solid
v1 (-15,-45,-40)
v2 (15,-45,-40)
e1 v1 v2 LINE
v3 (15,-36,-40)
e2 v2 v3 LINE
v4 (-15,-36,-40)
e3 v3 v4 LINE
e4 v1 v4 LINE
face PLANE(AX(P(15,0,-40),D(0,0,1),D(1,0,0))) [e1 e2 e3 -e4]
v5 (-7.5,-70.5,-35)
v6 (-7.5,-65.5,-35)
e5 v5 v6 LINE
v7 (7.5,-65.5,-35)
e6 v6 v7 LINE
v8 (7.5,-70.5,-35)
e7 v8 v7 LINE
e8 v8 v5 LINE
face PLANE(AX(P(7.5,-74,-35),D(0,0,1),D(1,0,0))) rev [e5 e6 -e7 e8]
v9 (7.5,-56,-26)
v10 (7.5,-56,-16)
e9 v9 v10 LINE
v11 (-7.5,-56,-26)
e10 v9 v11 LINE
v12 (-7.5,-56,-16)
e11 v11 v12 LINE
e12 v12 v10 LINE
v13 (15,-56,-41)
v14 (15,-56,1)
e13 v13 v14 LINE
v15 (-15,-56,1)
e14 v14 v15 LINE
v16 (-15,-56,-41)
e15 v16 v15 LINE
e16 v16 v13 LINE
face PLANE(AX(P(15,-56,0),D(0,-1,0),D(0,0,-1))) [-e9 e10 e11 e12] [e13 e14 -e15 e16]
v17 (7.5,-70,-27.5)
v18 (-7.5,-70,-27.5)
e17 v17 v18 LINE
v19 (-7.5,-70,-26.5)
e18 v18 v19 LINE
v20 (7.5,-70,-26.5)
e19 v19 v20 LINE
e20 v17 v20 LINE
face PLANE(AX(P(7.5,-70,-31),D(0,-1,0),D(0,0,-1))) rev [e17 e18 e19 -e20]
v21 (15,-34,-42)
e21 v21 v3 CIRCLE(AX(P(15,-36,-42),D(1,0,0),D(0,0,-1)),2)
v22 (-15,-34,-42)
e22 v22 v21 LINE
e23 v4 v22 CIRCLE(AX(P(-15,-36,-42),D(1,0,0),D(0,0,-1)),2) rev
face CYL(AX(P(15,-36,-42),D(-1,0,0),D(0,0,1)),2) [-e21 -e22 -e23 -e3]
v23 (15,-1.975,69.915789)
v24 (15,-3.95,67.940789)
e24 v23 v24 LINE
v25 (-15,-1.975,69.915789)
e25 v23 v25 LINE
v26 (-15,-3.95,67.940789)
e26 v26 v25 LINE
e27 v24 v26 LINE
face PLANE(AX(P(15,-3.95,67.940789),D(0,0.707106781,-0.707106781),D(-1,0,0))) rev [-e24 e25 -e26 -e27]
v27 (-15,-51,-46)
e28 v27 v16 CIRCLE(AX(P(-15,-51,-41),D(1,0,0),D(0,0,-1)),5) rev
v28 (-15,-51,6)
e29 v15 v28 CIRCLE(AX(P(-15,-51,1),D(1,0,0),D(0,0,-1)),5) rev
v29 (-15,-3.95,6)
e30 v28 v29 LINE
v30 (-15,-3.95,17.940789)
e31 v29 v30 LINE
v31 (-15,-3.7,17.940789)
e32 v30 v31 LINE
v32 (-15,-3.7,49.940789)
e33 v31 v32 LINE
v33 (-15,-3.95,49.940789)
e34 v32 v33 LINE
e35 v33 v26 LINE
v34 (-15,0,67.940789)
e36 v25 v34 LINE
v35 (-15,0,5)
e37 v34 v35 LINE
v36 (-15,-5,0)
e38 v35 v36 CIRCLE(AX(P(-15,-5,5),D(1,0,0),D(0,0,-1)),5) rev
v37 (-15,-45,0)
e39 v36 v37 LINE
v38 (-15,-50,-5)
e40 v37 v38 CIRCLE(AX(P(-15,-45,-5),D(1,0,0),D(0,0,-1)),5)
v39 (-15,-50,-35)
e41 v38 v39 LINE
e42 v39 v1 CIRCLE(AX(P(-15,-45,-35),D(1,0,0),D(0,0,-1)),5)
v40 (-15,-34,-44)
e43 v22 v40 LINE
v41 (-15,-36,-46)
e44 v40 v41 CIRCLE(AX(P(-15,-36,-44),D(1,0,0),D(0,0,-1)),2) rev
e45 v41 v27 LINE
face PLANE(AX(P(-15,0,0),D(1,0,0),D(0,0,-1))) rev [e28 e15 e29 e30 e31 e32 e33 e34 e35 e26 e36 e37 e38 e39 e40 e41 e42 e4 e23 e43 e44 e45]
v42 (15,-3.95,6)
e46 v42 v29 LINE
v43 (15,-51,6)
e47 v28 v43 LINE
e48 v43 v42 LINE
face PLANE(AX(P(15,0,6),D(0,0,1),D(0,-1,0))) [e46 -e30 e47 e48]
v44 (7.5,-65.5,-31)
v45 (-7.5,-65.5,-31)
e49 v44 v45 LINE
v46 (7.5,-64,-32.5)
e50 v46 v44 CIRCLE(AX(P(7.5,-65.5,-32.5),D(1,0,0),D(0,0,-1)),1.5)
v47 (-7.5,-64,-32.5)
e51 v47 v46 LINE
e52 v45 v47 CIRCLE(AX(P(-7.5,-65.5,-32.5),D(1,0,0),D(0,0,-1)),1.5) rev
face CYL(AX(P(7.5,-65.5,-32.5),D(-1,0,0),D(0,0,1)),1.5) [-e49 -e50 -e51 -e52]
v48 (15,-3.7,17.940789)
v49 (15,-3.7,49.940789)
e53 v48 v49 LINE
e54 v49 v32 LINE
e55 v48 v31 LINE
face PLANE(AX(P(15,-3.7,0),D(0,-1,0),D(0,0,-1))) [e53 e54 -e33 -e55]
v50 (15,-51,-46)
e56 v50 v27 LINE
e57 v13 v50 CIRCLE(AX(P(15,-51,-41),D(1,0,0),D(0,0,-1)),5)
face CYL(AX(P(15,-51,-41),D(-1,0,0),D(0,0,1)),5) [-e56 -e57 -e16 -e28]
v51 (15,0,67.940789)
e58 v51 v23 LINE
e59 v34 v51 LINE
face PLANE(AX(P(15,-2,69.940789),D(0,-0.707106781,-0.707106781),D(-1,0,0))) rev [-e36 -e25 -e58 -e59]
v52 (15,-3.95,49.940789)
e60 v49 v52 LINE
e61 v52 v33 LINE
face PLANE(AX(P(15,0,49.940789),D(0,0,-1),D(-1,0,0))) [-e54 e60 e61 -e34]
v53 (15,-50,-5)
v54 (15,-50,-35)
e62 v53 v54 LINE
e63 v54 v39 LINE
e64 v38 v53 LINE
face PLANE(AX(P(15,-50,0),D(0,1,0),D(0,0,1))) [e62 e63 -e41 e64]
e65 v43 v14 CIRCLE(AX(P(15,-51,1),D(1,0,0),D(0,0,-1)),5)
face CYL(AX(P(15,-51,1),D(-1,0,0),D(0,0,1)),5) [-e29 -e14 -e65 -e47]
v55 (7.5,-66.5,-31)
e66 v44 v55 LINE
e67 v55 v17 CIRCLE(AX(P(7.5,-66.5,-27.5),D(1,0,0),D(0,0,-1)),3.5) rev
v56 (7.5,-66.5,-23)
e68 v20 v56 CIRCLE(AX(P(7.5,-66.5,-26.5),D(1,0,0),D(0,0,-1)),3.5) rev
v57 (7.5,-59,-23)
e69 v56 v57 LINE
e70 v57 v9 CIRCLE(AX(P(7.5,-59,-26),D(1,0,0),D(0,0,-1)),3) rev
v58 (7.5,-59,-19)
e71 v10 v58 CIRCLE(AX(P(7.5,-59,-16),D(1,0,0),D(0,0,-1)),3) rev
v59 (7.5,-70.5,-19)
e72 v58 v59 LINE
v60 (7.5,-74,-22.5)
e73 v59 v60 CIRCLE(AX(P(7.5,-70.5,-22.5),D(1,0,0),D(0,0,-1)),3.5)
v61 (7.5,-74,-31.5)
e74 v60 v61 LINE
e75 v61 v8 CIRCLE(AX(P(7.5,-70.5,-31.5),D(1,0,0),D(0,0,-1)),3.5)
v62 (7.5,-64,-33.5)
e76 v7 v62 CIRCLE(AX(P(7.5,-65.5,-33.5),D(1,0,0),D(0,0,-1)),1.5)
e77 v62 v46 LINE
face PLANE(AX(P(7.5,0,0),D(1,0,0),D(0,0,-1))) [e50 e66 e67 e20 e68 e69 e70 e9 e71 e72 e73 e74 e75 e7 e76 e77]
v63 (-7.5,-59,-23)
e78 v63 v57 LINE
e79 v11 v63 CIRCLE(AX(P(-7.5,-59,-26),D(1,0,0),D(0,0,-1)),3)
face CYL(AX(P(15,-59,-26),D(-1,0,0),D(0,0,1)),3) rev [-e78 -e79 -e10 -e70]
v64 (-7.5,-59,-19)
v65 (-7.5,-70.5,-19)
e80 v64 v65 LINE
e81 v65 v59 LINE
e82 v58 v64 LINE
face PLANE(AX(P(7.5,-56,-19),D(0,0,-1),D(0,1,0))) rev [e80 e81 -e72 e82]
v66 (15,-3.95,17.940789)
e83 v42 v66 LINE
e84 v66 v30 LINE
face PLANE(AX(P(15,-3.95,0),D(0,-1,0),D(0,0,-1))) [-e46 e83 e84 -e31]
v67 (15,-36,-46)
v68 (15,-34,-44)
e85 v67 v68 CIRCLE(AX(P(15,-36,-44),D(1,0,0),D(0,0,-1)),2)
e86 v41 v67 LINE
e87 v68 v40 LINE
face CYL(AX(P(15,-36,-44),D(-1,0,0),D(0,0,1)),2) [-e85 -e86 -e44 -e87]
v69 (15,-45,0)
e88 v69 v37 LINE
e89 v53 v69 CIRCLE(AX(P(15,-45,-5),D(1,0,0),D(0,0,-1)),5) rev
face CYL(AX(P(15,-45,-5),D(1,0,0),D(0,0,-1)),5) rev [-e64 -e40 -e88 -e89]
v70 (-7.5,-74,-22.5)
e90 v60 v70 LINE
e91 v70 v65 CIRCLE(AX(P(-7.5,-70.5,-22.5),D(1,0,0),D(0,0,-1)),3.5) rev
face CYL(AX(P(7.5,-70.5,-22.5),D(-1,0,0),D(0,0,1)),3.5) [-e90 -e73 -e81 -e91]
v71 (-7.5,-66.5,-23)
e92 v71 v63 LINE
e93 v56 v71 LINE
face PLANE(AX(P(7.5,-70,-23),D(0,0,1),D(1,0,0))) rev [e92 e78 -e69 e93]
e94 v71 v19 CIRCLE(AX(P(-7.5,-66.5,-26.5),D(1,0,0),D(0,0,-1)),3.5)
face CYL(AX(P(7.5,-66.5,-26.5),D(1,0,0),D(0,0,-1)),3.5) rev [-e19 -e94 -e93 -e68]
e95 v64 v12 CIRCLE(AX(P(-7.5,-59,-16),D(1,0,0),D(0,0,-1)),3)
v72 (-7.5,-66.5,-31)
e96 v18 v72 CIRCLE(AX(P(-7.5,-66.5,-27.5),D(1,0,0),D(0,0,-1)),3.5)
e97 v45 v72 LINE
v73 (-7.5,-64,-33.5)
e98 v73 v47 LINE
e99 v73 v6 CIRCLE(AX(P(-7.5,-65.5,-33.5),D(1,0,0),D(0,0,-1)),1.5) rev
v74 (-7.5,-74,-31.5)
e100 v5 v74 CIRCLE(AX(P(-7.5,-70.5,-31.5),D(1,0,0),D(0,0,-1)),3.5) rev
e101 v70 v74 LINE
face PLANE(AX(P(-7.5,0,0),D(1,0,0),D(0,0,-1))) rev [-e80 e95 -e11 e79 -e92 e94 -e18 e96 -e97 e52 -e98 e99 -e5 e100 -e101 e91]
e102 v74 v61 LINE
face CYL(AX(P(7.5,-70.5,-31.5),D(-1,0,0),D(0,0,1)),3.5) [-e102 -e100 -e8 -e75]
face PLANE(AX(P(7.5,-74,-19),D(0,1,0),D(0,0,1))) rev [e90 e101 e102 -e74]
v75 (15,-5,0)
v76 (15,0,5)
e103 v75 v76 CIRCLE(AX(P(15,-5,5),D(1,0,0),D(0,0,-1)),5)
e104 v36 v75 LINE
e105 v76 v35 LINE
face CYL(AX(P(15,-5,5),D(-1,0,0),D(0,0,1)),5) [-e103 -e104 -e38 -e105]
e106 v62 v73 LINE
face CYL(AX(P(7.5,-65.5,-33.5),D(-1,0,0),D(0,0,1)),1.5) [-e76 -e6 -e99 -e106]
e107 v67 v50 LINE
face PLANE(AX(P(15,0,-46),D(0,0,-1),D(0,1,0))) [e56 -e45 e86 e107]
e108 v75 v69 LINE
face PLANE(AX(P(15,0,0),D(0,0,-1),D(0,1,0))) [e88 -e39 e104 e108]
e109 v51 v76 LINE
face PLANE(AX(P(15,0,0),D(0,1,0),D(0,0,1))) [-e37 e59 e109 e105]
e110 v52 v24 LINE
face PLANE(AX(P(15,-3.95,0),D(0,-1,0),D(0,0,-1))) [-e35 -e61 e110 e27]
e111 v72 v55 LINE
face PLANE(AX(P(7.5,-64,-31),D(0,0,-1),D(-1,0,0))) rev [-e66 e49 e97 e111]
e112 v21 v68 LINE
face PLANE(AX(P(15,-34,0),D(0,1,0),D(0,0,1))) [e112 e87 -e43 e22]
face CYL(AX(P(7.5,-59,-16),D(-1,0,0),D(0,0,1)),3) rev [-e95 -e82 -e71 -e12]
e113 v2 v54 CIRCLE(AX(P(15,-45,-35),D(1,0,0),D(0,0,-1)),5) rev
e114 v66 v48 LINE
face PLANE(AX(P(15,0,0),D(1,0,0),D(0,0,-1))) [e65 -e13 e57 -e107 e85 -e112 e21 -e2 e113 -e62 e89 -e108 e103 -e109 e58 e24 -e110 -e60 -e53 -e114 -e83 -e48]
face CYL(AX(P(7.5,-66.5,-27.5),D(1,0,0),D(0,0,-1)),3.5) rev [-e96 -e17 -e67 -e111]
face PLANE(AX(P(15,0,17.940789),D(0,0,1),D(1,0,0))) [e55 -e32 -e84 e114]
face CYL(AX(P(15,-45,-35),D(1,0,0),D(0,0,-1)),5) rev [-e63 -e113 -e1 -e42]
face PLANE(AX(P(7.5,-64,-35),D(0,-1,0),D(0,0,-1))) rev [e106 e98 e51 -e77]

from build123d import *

# Parameters (mm, degrees)
BOSS_EXTRUDE1_DEPTH = 15
FILLET2_R           = 5
FILLET3_R           = 5
FILLET4_R           = 5
CHAMFER1_SIZE       = 2
BOSS_EXTRUDE2_DEPTH = 7.5
FILLET5_R           = 3
FILLET6_R           = 3.5
FILLET7_R           = 3.5
FILLET8_R           = 1.5
FILLET9_R           = 2


with BuildPart() as part:
    # Sketch1 → Boss-Extrude1 (new, symmetric)
    with BuildSketch(Plane(origin=(0, 0, 0), x_dir=(0, 0, -1), z_dir=(1, 0, 0))):
        Polygon((0, 0), (-15, 0), (-69.940788655, 0), (-69.940788655, -3.95), (-49.940788655, -3.95), (-49.940788655, -3.7), (-17.940788655, -3.7), (-17.940788655, -3.95), (-13.226857143, -3.95), (-6, -3.95), (-6, -56), (46, -56), (46, -34), (40, -34), (40, -50), (0, -50), align=None)
    extrude(amount=BOSS_EXTRUDE1_DEPTH, both=True)

    # Fillet2
    fillet2_edges = [part.edges().sort_by_distance(p)[0] for p in [
        (0, 0, 0),
    ]]
    fillet(fillet2_edges, radius=FILLET2_R)

    # Fillet3
    fillet3_edges = [part.edges().sort_by_distance(p)[0] for p in [
        (0, -50, 0),
        (0, -50, -40),
    ]]
    fillet(fillet3_edges, radius=FILLET3_R)

    # Fillet4
    fillet4_edges = [part.edges().sort_by_distance(p)[0] for p in [
        (0, -56, -46),
        (0, -56, 6),
    ]]
    fillet(fillet4_edges, radius=FILLET4_R)

    # Chamfer1
    # the kernel refuses this chamfer: 2 mm, written as the material it takes off along each edge
    with BuildSketch(Plane(origin=(-20.143365976, -3.95, 69.940788655), x_dir=(0, -0.027495876610586414, -0.9996219169112968), z_dir=(1, 0, 0))) as chamfer1_piece_1:
        Polygon((CHAMFER1_SIZE * 0.999621916911, CHAMFER1_SIZE * 0.0274958766106), (-CHAMFER1_SIZE * 0.0274958766106, CHAMFER1_SIZE * 0.999621916911), (0, 0), align=None)
    extrude(amount=40.286731952, mode=Mode.SUBTRACT)
    with BuildSketch(Plane(origin=(-20.143365976, 0, 69.940788655), x_dir=(0, 0.027495876610585952, -0.9996219169112968), z_dir=(1, 0, 0))) as chamfer1_piece_2:
        Polygon((CHAMFER1_SIZE * 0.999621916911, -CHAMFER1_SIZE * 0.0274958766106), (-CHAMFER1_SIZE * 0.0274958766106, -CHAMFER1_SIZE * 0.999621916911), (0, 0), align=None)
    extrude(amount=40.286731952, mode=Mode.SUBTRACT)

    # Sketch3 → Boss-Extrude2 (add, symmetric)
    with BuildSketch(Plane(origin=(0, 0, 0), x_dir=(0, 0, -1), z_dir=(1, 0, 0))):
        Polygon((19, -56), (19, -74), (35, -74), (35, -64), (31, -64), (31, -70), (23, -70), (23, -56), align=None)
    extrude(amount=BOSS_EXTRUDE2_DEPTH, both=True)

    # Fillet5
    fillet5_edges = [part.edges().sort_by_distance(p)[0] for p in [
        (0, -56, -23),
        (0, -56, -19),
    ]]
    fillet(fillet5_edges, radius=FILLET5_R)

    # Fillet6
    fillet6_edges = [part.edges().sort_by_distance(p)[0] for p in [
        (0, -70, -31),
        (0, -70, -23),
    ]]
    fillet(fillet6_edges, radius=FILLET6_R)

    # Fillet7
    fillet7_edges = [part.edges().sort_by_distance(p)[0] for p in [
        (0, -74, -19),
        (0, -74, -35),
    ]]
    fillet(fillet7_edges, radius=FILLET7_R)

    # Fillet8
    fillet8_edges = [part.edges().sort_by_distance(p)[0] for p in [
        (0, -64, -35),
        (0, -64, -31),
    ]]
    fillet(fillet8_edges, radius=FILLET8_R)

    # Fillet9
    fillet9_edges = [part.edges().sort_by_distance(p)[0] for p in [
        (0, -34, -40),
        (0, -34, -46),
    ]]
    fillet(fillet9_edges, radius=FILLET9_R)


solid = part.part
